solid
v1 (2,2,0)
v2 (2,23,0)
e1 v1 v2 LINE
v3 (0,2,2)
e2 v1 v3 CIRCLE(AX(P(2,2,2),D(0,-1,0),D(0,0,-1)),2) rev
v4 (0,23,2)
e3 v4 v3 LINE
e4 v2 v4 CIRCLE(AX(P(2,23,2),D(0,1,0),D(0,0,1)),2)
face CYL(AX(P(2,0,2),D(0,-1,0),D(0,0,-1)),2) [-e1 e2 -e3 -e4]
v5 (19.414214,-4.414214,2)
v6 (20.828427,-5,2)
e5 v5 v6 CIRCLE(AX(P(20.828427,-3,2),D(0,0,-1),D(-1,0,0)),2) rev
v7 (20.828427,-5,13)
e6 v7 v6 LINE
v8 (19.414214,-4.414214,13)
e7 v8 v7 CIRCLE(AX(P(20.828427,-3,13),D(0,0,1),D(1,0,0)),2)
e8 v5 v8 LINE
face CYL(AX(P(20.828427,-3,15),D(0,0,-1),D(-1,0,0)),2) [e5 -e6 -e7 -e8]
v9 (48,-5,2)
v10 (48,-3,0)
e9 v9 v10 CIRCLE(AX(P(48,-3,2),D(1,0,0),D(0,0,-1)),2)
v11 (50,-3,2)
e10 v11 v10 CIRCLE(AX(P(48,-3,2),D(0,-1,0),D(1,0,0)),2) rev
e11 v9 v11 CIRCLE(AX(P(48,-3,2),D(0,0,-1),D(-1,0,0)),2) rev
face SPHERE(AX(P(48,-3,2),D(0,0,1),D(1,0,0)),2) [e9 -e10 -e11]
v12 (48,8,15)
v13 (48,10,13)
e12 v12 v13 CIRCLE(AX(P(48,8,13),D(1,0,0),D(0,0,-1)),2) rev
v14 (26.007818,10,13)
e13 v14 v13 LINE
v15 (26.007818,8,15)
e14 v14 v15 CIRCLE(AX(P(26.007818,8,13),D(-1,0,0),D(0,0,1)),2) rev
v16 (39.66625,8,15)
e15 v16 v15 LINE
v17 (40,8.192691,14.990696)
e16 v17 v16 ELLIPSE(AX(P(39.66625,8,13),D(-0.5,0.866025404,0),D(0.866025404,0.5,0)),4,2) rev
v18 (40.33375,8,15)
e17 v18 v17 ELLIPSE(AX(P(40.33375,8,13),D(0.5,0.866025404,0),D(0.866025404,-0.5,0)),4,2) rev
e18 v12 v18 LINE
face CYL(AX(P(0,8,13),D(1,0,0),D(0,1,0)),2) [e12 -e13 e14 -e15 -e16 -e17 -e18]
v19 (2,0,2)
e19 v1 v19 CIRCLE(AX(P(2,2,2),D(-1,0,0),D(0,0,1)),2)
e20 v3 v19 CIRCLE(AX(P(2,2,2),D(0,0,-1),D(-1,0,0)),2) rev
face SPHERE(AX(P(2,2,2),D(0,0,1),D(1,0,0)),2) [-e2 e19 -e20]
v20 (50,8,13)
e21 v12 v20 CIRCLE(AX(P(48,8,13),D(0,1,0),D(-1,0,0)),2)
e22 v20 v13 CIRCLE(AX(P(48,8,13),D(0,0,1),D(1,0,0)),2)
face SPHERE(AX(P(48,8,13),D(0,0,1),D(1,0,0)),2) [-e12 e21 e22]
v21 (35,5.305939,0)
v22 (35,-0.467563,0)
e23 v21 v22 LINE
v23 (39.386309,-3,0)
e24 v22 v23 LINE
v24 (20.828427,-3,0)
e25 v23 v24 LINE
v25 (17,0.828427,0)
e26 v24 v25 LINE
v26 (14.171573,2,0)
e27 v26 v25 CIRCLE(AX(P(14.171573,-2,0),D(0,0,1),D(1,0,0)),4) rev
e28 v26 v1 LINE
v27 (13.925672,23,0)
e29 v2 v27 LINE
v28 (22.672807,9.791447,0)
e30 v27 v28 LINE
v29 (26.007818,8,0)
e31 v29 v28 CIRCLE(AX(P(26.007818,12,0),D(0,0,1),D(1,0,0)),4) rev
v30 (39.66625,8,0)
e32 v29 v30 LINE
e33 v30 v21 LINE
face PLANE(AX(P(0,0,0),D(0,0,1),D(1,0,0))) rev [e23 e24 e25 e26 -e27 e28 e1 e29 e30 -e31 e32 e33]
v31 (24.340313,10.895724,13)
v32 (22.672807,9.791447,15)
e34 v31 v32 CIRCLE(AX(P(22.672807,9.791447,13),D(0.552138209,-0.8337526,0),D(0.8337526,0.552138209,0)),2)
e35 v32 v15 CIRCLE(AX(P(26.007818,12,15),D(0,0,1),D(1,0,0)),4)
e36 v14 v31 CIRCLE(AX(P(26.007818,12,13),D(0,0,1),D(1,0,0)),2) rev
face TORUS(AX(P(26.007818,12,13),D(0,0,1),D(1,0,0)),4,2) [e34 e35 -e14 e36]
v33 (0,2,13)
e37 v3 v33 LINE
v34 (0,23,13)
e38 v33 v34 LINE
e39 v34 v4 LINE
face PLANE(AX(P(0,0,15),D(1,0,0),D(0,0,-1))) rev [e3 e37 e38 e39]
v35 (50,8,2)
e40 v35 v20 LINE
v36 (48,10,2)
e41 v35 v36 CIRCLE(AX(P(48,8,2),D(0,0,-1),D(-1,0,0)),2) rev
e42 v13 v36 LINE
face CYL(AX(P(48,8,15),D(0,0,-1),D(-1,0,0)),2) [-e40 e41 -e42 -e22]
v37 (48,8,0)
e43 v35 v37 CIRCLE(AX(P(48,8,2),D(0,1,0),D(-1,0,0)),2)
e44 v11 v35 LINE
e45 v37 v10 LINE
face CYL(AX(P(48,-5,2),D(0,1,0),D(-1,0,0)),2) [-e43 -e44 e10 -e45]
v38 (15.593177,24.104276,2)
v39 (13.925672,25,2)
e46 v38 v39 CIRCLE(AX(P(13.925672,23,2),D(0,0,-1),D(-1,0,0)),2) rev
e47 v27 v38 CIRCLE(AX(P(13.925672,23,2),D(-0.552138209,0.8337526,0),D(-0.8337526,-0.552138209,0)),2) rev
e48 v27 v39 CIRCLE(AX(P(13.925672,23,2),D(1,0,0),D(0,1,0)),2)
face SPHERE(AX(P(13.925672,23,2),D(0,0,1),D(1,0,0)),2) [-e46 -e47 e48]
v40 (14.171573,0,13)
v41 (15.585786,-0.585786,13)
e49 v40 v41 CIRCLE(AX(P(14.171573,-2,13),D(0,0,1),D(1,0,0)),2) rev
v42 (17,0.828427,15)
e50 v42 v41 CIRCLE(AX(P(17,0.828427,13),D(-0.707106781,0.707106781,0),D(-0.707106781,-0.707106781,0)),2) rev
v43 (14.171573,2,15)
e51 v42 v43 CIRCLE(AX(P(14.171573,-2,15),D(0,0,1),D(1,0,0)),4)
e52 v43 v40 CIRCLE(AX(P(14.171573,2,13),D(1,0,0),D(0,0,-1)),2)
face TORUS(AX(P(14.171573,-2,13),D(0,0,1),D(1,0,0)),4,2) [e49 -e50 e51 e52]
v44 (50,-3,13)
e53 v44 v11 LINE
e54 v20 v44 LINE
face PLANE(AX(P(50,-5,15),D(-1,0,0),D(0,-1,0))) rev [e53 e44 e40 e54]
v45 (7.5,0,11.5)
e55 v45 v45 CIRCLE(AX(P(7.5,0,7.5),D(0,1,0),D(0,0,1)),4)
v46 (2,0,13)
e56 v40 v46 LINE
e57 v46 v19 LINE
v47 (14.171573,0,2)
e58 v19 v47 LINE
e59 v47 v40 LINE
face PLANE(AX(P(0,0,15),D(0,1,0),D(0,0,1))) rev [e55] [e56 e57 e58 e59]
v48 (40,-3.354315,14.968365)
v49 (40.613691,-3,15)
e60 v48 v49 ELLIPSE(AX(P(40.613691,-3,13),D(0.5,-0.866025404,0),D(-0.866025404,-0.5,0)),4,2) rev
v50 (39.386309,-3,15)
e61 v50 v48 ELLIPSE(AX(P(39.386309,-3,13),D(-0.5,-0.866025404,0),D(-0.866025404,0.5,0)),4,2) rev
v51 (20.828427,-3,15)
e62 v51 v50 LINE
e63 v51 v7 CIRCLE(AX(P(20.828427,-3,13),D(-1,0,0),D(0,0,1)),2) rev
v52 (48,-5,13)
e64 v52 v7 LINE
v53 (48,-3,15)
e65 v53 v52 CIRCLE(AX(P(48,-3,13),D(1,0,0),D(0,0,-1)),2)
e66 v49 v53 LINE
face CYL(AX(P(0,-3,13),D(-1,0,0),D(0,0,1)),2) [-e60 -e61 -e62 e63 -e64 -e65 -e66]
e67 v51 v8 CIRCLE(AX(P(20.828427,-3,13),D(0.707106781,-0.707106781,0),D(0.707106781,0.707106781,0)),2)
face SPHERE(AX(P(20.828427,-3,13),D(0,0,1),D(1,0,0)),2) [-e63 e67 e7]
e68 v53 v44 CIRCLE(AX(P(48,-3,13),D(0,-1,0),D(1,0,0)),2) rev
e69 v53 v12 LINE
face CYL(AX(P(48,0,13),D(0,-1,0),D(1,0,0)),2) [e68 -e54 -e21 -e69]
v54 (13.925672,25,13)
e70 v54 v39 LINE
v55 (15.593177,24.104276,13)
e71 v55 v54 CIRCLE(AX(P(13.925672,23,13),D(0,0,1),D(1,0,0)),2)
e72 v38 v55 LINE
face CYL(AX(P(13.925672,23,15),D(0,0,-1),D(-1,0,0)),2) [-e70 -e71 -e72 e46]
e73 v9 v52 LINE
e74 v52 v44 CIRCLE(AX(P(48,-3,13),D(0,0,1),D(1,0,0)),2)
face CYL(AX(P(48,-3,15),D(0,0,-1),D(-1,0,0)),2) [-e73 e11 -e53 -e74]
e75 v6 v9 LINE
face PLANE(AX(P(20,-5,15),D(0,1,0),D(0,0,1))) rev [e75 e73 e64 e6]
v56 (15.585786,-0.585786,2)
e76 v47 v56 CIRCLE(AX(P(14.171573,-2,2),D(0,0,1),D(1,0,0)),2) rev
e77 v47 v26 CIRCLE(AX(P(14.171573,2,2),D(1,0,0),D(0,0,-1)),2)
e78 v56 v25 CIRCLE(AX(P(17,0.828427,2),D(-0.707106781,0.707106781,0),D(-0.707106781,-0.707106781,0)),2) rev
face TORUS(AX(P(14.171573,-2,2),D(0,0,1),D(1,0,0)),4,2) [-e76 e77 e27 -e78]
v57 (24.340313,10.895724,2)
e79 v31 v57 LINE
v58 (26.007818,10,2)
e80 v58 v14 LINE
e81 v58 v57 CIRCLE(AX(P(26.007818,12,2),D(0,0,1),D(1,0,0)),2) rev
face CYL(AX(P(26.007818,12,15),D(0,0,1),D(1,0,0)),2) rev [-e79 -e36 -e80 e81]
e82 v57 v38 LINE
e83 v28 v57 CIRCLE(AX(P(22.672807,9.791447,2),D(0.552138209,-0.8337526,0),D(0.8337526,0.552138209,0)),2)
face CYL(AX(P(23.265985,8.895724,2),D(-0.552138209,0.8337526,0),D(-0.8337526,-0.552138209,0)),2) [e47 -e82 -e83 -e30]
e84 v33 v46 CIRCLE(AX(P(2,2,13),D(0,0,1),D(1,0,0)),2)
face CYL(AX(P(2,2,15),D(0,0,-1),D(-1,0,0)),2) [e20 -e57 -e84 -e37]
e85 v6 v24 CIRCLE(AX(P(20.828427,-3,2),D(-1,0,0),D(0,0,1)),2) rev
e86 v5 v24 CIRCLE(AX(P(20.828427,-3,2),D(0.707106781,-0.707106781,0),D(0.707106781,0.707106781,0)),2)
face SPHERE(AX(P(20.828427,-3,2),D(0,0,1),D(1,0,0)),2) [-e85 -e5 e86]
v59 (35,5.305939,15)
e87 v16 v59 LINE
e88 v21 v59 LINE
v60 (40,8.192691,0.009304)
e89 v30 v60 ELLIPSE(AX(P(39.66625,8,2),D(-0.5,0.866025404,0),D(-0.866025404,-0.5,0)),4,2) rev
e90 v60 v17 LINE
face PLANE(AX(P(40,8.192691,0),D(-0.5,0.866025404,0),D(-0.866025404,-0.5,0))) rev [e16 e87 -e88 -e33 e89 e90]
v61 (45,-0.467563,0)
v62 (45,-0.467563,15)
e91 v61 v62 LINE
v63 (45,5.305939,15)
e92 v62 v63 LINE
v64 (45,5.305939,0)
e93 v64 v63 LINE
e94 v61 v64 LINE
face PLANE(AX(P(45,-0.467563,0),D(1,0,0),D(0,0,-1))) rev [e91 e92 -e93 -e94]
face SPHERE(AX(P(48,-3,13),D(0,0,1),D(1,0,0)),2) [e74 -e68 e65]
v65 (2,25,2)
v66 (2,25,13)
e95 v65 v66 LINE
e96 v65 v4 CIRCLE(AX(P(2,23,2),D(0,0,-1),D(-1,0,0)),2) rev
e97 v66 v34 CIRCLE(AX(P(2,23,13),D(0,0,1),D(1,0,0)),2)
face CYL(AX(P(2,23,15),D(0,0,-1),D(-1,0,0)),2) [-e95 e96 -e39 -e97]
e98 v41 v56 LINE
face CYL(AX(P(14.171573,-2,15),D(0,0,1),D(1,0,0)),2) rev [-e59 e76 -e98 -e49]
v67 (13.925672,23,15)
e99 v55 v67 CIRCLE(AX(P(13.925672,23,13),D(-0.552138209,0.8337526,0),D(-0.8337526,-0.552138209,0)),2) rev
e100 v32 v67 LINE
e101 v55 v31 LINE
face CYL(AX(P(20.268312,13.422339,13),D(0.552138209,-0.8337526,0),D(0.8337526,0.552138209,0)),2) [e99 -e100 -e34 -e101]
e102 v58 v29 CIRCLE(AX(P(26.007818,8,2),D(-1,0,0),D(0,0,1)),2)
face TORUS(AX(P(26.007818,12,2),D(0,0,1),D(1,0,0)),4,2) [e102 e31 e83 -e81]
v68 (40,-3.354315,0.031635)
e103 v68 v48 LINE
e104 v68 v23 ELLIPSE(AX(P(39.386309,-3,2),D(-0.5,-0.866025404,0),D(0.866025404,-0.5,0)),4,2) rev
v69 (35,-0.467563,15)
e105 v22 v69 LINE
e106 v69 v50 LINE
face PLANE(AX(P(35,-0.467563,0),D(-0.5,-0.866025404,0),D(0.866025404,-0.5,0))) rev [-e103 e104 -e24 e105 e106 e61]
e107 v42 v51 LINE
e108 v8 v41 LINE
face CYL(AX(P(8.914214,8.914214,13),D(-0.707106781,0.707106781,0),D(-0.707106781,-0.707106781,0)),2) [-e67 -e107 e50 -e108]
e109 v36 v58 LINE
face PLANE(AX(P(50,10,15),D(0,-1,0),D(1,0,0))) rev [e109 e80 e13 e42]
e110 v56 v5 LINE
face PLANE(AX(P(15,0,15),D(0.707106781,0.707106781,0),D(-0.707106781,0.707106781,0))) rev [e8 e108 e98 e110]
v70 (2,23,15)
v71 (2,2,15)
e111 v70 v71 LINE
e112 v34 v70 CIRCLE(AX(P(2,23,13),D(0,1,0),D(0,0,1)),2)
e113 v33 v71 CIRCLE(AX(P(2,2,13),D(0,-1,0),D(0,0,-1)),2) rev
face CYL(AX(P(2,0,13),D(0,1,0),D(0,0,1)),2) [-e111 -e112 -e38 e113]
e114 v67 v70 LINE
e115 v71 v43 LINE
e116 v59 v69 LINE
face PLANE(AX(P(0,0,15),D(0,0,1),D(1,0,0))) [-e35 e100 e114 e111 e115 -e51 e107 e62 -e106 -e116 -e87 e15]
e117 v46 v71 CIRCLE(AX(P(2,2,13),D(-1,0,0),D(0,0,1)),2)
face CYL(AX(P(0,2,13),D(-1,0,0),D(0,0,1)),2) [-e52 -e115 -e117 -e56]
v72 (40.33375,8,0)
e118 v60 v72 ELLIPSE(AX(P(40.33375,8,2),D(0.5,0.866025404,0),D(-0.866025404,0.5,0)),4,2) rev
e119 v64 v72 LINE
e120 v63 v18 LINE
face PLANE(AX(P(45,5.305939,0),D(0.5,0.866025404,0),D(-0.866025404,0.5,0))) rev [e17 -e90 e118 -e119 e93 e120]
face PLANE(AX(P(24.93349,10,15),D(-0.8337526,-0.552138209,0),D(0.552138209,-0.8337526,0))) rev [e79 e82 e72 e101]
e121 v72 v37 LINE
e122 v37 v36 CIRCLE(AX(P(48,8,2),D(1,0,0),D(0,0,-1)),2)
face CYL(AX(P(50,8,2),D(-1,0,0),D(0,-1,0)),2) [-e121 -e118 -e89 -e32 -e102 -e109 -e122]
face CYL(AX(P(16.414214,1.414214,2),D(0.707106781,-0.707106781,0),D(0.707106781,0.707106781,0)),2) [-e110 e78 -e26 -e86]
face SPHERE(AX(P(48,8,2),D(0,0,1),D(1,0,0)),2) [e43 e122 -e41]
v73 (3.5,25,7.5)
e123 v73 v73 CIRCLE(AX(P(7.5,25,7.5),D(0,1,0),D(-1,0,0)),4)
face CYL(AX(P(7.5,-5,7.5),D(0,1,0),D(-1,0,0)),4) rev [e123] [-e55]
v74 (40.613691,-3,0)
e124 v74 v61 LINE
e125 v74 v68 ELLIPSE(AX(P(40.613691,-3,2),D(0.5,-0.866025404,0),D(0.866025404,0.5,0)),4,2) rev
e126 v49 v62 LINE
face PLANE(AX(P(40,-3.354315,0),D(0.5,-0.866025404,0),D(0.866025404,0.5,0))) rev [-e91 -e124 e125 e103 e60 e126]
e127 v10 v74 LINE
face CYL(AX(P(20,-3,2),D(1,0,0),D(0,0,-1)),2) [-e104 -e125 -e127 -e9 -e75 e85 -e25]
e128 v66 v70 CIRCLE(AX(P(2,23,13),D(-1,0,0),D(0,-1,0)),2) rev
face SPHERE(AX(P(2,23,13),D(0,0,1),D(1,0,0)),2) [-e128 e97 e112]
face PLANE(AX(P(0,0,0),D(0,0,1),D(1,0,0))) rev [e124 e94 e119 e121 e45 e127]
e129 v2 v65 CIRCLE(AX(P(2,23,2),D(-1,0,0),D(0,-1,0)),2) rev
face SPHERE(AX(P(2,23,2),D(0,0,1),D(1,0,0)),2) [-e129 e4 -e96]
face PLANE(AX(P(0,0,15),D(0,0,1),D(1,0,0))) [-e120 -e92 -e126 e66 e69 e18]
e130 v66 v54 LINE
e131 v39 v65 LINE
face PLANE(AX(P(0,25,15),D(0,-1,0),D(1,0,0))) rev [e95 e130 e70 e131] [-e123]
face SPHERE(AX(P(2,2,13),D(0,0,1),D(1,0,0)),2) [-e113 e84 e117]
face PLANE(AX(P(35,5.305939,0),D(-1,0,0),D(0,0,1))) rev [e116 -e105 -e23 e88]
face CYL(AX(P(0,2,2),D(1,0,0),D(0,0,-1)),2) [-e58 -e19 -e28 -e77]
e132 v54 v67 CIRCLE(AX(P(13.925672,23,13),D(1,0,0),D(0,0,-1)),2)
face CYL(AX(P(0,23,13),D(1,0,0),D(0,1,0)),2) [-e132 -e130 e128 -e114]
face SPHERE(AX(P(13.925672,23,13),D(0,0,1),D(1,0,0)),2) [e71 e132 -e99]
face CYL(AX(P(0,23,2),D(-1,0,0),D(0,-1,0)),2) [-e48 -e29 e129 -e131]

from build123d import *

# Parameters (mm, degrees)
BOSS_EXTRUDE1_DEPTH = 15
SKETCH2_R           = 4.000000000000001
CUT_EXTRUDE1_DEPTH  = 61.20797289396146
CUT_EXTRUDE2_DEPTH  = 15
FILLET1_R           = 2


with BuildPart() as part:
    # Sketch1 → Boss-Extrude1 (new body)
    with BuildSketch(Plane.XY):
        Polygon((0, 0), (15, 0), (19.999999999999982, -5), (49.99999999999999, -5), (49.999999999999986, 10.000000000000002), (24.93349002823336, 9.999999999999998), (15, 24.999999999999993), (0, 24.999999999999996), align=None)
    extrude(amount=BOSS_EXTRUDE1_DEPTH)

    # Sketch2 → Cut-Extrude1 (cut, through all)
    with BuildSketch(Plane(origin=(5.78e-15, 24.999999999999996, 0), x_dir=(1, -2.3e-16, 0), z_dir=(2.3e-16, 1, 0))):
        with Locations(Location((7.499999999999995, -7.5, 0), (0, 0, 180))):
            Circle(SKETCH2_R)
    extrude(amount=-CUT_EXTRUDE1_DEPTH, mode=Mode.SUBTRACT)

    # Sketch3 → Cut-Extrude2 (cut)
    with BuildSketch(Plane.XY.offset(15)):
        Polygon((45, -0.4675632330808986), (45, 5.305939458815377), (39.99999999999999, 8.192690804763508), (34.999999999999986, 5.305939458815372), (34.999999999999986, -0.46756323308090486), (39.999999999999986, -3.354314579029036), align=None)
    extrude(amount=-CUT_EXTRUDE2_DEPTH, mode=Mode.SUBTRACT)

    # Fillet1
    # the kernel refuses this fillet: 2 mm, written as the material it adds along each edge
    with BuildSketch(Plane(origin=(24.93349002823336, 9.999999999999998, 0), x_dir=(-0.5521382091872268, 0.8337525999692728, 0), z_dir=(0, 0, 1))) as fillet1_piece_1:
        with BuildLine():
            CenterArc((FILLET1_R * 0.537163891098, -FILLET1_R), FILLET1_R, 90.00000000000004, 56.486172927445)
            Line((-FILLET1_R * 0.296588708871, -FILLET1_R * 0.447861790813), (0, 0))
            Line((0, 0), (FILLET1_R * 0.537163891098, -7e-17))
        make_face()
    extrude(amount=15)
    with BuildSketch(Plane(origin=(15, 0, 0), x_dir=(-1, 0, 0), z_dir=(0, 0, 1))) as fillet1_piece_2:
        with BuildLine():
            CenterArc((FILLET1_R * 0.414213562373, FILLET1_R), FILLET1_R, 224.99999999999994, 45.00000000000006)
            Line((-FILLET1_R * 0.292893218813, FILLET1_R * 0.292893218813), (0, 0))
            Line((0, 0), (FILLET1_R * 0.414213562373, 0))
        make_face()
    extrude(amount=15)
    # the kernel refuses this fillet: 2 mm, written as the material it takes off along each edge
    with BuildSketch(Plane(origin=(2, 2, 13), x_dir=(0, 0, 1), z_dir=(0, -1, 0))) as fillet1_2_piece_1_section:
        Polygon((0, 0), (FILLET1_R, 0), (FILLET1_R, FILLET1_R), (0, FILLET1_R), align=None)
    fillet1_2_piece_1 = extrude(amount=FILLET1_R, mode=Mode.PRIVATE)
    fillet1_2_piece_1 = fillet1_2_piece_1 - Plane(origin=(2, 2, 13), x_dir=(0.7071067811865475, 0, -0.7071067811865475), z_dir=(0, -1, 0)) * Sphere(FILLET1_R, mode=Mode.PRIVATE)
    add(fillet1_2_piece_1, mode=Mode.SUBTRACT)
    with BuildSketch(Plane(origin=(2, 22.999999999999996, 2), x_dir=(-1, 0, 0), z_dir=(0, 0, -1))) as fillet1_2_piece_2_section:
        Polygon((0, 0), (FILLET1_R, 0), (FILLET1_R, FILLET1_R), (-4.7e-16, FILLET1_R), align=None)
    fillet1_2_piece_2 = extrude(amount=FILLET1_R, mode=Mode.PRIVATE)
    fillet1_2_piece_2 = fillet1_2_piece_2 - Plane(origin=(2, 22.999999999999996, 2), x_dir=(0.7071067811865475, -0.7071067811865476, 0), z_dir=(0, 0, -1)) * Sphere(FILLET1_R, mode=Mode.PRIVATE)
    add(fillet1_2_piece_2, mode=Mode.SUBTRACT)
    with BuildSketch(Plane(origin=(2, 2, 2), x_dir=(0, 0, -1), z_dir=(0, -1, 0))) as fillet1_2_piece_3_section:
        Polygon((0, 0), (FILLET1_R, 0), (FILLET1_R, -FILLET1_R), (0, -FILLET1_R), align=None)
    fillet1_2_piece_3 = extrude(amount=FILLET1_R, mode=Mode.PRIVATE)
    fillet1_2_piece_3 = fillet1_2_piece_3 - Plane(origin=(2, 2, 2), x_dir=(0.7071067811865475, 0, 0.7071067811865475), z_dir=(0, -1, 0)) * Sphere(FILLET1_R, mode=Mode.PRIVATE)
    add(fillet1_2_piece_3, mode=Mode.SUBTRACT)
    with BuildSketch(Plane(origin=(13.92567221780351, 22.999999999999993, 2), x_dir=(0.8337525999692725, 0.5521382091872273, 0), z_dir=(0, 0, -1))) as fillet1_2_piece_4_section:
        Polygon((0, 0), (FILLET1_R, -3e-17), (FILLET1_R, -FILLET1_R * 0.537163891098), (FILLET1_R * 0.552138209187, -FILLET1_R * 0.833752599969), align=None)
    fillet1_2_piece_4 = extrude(amount=FILLET1_R, mode=Mode.PRIVATE)
    fillet1_2_piece_4 = fillet1_2_piece_4 - Plane(origin=(13.92567221780351, 22.999999999999993, 2), x_dir=(-0.47321337196489544, -0.8809478444230473, 0), z_dir=(0, 0, -1)) * Sphere(FILLET1_R, mode=Mode.PRIVATE)
    add(fillet1_2_piece_4, mode=Mode.SUBTRACT)
    with BuildSketch(Plane(origin=(20.828427124746174, -3, 13), x_dir=(-0.7071067811865488, -0.7071067811865462, 0), z_dir=(0, 0, 1))) as fillet1_2_piece_5_section:
        Polygon((0, 0), (FILLET1_R, -2e-17), (FILLET1_R, FILLET1_R * 0.414213562373), (FILLET1_R * 0.707106781187, FILLET1_R * 0.707106781187), align=None)
    fillet1_2_piece_5 = extrude(amount=FILLET1_R, mode=Mode.PRIVATE)
    fillet1_2_piece_5 = fillet1_2_piece_5 - Plane(origin=(20.828427124746174, -3, 13), x_dir=(0.3826834323650906, 0.9238795325112864, 0), z_dir=(0, 0, 1)) * Sphere(FILLET1_R, mode=Mode.PRIVATE)
    add(fillet1_2_piece_5, mode=Mode.SUBTRACT)
    with BuildSketch(Plane(origin=(13.925672217803509, 22.999999999999996, 13), x_dir=(2.4e-16, 1, 0), z_dir=(0, 0, 1))) as fillet1_2_piece_6_section:
        Polygon((0, 0), (FILLET1_R, 0), (FILLET1_R, -FILLET1_R * 0.537163891098), (FILLET1_R * 0.552138209187, -FILLET1_R * 0.833752599969), align=None)
    fillet1_2_piece_6 = extrude(amount=FILLET1_R, mode=Mode.PRIVATE)
    fillet1_2_piece_6 = fillet1_2_piece_6 - Plane(origin=(13.925672217803509, 22.999999999999996, 13), x_dir=(-0.47321337196489544, -0.8809478444230473, 0), z_dir=(0, 0, 1)) * Sphere(FILLET1_R, mode=Mode.PRIVATE)
    add(fillet1_2_piece_6, mode=Mode.SUBTRACT)
    with BuildSketch(Plane(origin=(47.999999999999986, 8.000000000000002, 2), x_dir=(1, 4.7e-16, 0), z_dir=(0, 0, -1))) as fillet1_2_piece_7_section:
        Polygon((0, 0), (FILLET1_R, 0), (FILLET1_R, -FILLET1_R), (6.6e-16, -FILLET1_R), align=None)
    fillet1_2_piece_7 = extrude(amount=FILLET1_R, mode=Mode.PRIVATE)
    fillet1_2_piece_7 = fillet1_2_piece_7 - Plane(origin=(47.999999999999986, 8.000000000000002, 2), x_dir=(-0.7071067811865472, -0.7071067811865477, 0), z_dir=(0, 0, -1)) * Sphere(FILLET1_R, mode=Mode.PRIVATE)
    add(fillet1_2_piece_7, mode=Mode.SUBTRACT)
    with BuildSketch(Plane(origin=(47.999999999999986, 8.000000000000002, 13), x_dir=(1, 4.7e-16, 0), z_dir=(0, 0, 1))) as fillet1_2_piece_8_section:
        Polygon((0, 0), (FILLET1_R, 0), (FILLET1_R, FILLET1_R), (6.6e-16, FILLET1_R), align=None)
    fillet1_2_piece_8 = extrude(amount=FILLET1_R, mode=Mode.PRIVATE)
    fillet1_2_piece_8 = fillet1_2_piece_8 - Plane(origin=(47.999999999999986, 8.000000000000002, 13), x_dir=(-0.7071067811865472, -0.7071067811865477, 0), z_dir=(0, 0, 1)) * Sphere(FILLET1_R, mode=Mode.PRIVATE)
    add(fillet1_2_piece_8, mode=Mode.SUBTRACT)
    with BuildSketch(Plane(origin=(47.99999999999999, -3, 2), x_dir=(0, 0, -1), z_dir=(0, -1, 0))) as fillet1_2_piece_9_section:
        Polygon((0, 0), (FILLET1_R, 0), (FILLET1_R, FILLET1_R), (0, FILLET1_R), align=None)
    fillet1_2_piece_9 = extrude(amount=FILLET1_R, mode=Mode.PRIVATE)
    fillet1_2_piece_9 = fillet1_2_piece_9 - Plane(origin=(47.99999999999999, -3, 2), x_dir=(-0.7071067811865475, 0, 0.7071067811865475), z_dir=(0, -1, 0)) * Sphere(FILLET1_R, mode=Mode.PRIVATE)
    add(fillet1_2_piece_9, mode=Mode.SUBTRACT)
    with BuildSketch(Plane(origin=(47.99999999999999, -3, 13), x_dir=(1, 4.7e-16, 0), z_dir=(0, -1, 0))) as fillet1_2_piece_10_section:
        Polygon((0, 0), (FILLET1_R, 0), (FILLET1_R, FILLET1_R), (0, FILLET1_R), align=None)
    fillet1_2_piece_10 = extrude(amount=FILLET1_R, mode=Mode.PRIVATE)
    fillet1_2_piece_10 = fillet1_2_piece_10 - Plane(origin=(47.99999999999999, -3, 13), x_dir=(-0.7071067811865475, 0, -0.7071067811865475), z_dir=(0, -1, 0)) * Sphere(FILLET1_R, mode=Mode.PRIVATE)
    add(fillet1_2_piece_10, mode=Mode.SUBTRACT)
    with BuildSketch(Plane(origin=(20.828427124746174, -3, 2), x_dir=(-0.7071067811865488, -0.7071067811865462, 0), z_dir=(0, 0, -1))) as fillet1_2_piece_11_section:
        Polygon((0, 0), (FILLET1_R, 2e-17), (FILLET1_R, -FILLET1_R * 0.414213562373), (FILLET1_R * 0.707106781187, -FILLET1_R * 0.707106781187), align=None)
    fillet1_2_piece_11 = extrude(amount=FILLET1_R, mode=Mode.PRIVATE)
    fillet1_2_piece_11 = fillet1_2_piece_11 - Plane(origin=(20.828427124746174, -3, 2), x_dir=(0.3826834323650906, 0.9238795325112864, 0), z_dir=(0, 0, -1)) * Sphere(FILLET1_R, mode=Mode.PRIVATE)
    add(fillet1_2_piece_11, mode=Mode.SUBTRACT)
    with BuildSketch(Plane(origin=(2, 22.999999999999996, 13), x_dir=(-1, 0, 0), z_dir=(0, 0, 1))) as fillet1_2_piece_12_section:
        Polygon((0, 0), (FILLET1_R, 0), (FILLET1_R, -FILLET1_R), (-4.7e-16, -FILLET1_R), align=None)
    fillet1_2_piece_12 = extrude(amount=FILLET1_R, mode=Mode.PRIVATE)
    fillet1_2_piece_12 = fillet1_2_piece_12 - Plane(origin=(2, 22.999999999999996, 13), x_dir=(0.7071067811865475, -0.7071067811865476, 0), z_dir=(0, 0, 1)) * Sphere(FILLET1_R, mode=Mode.PRIVATE)
    add(fillet1_2_piece_12, mode=Mode.SUBTRACT)
    with BuildSketch(Plane(origin=(1.9999999999999998, 0, 15), x_dir=(0, 0, -1), z_dir=(1, 0, 0))) as fillet1_2_piece_13:
        with BuildLine():
            CenterArc((FILLET1_R, FILLET1_R), FILLET1_R, 180, 90)
            Line((0, FILLET1_R), (0, 0))
            Line((0, 0), (FILLET1_R, 0))
        make_face()
    extrude(amount=12.171572875253808, mode=Mode.SUBTRACT)
    with BuildSketch(Plane(origin=(0, 22.999999999999996, 0), x_dir=(1, 0, 0), z_dir=(0, -1, 0))) as fillet1_2_piece_14:
        with BuildLine():
            CenterArc((FILLET1_R, FILLET1_R), FILLET1_R, 180, 90)
            Line((0, FILLET1_R), (0, 0))
            Line((0, 0), (FILLET1_R, 0))
        make_face()
    extrude(amount=20.999999999999996, mode=Mode.SUBTRACT)
    with BuildSketch(Plane(origin=(13.92567221780351, 24.999999999999993, 0), x_dir=(-2.4e-16, -1, 0), z_dir=(-1, 2.4e-16, 0))) as fillet1_2_piece_15:
        with BuildLine():
            CenterArc((FILLET1_R, FILLET1_R), FILLET1_R, 180, 90)
            Line((0, FILLET1_R), (0, 0))
            Line((0, 0), (FILLET1_R, 0))
        make_face()
    extrude(amount=11.92567221780351, mode=Mode.SUBTRACT)
    with BuildSketch(Plane(origin=(15.585786437626904, -0.5857864376269062, 15), x_dir=(0.7071067811865488, 0.7071067811865462, 0), z_dir=(0.7071067811865462, -0.7071067811865488, 0))) as fillet1_2_piece_16:
        with BuildLine():
            CenterArc((FILLET1_R, -FILLET1_R), FILLET1_R, 90, 90)
            Line((-1.88e-15, -FILLET1_R), (0, 0))
            Line((0, 0), (FILLET1_R, 0))
        make_face()
    extrude(amount=5.4142135623730825, mode=Mode.SUBTRACT)
    with BuildSketch(Plane(origin=(15, 24.999999999999993, 2), x_dir=(-1, 0, 0), z_dir=(0, 0, 1))) as fillet1_2_piece_17:
        with BuildLine():
            CenterArc((FILLET1_R * 0.537163891098, FILLET1_R), FILLET1_R, 213.5138270725551, 56.4861729274449)
            Line((-FILLET1_R * 0.296588708871, FILLET1_R * 0.447861790813), (0, 0))
            Line((0, 0), (FILLET1_R * 0.537163891098, 0))
        make_face()
    extrude(amount=11, mode=Mode.SUBTRACT)
    with BuildSketch(Plane(origin=(49.999999999999986, 10.000000000000002, 2), x_dir=(0, -1, 0), z_dir=(0, 0, 1))) as fillet1_2_piece_18:
        with BuildLine():
            CenterArc((FILLET1_R, -FILLET1_R), FILLET1_R, 90.00000000000006, 89.99999999999994)
            Line((1.78e-15, -FILLET1_R), (0, 0))
            Line((0, 0), (FILLET1_R, 0))
        make_face()
    extrude(amount=11, mode=Mode.SUBTRACT)
    with BuildSketch(Plane(origin=(49.99999999999999, -5, 2), x_dir=(-1, 0, 0), z_dir=(0, 0, 1))) as fillet1_2_piece_19:
        with BuildLine():
            CenterArc((FILLET1_R, -FILLET1_R), FILLET1_R, 90, 90)
            Line((0, -FILLET1_R), (0, 0))
            Line((0, 0), (FILLET1_R, 0))
        make_face()
    extrude(amount=11, mode=Mode.SUBTRACT)
    with BuildSketch(Plane(origin=(19.999999999999982, -5, 2), x_dir=(-0.7071067811865454, 0.7071067811865497, 0), z_dir=(0, 0, 1))) as fillet1_2_piece_20:
        with BuildLine():
            CenterArc((FILLET1_R * 0.414213562373, -FILLET1_R), FILLET1_R, 90.00000000000001, 45.00000000000007)
            Line((-FILLET1_R * 0.292893218813, -FILLET1_R * 0.292893218813), (0, 0))
            Line((0, 0), (FILLET1_R * 0.414213562373, 1e-17))
        make_face()
    extrude(amount=11, mode=Mode.SUBTRACT)
    with BuildSketch(Plane(origin=(0, 0, 2), x_dir=(1, 0, 0), z_dir=(0, 0, 1))) as fillet1_2_piece_21:
        with BuildLine():
            CenterArc((FILLET1_R, FILLET1_R), FILLET1_R, 180, 90)
            Line((-2.2e-16, FILLET1_R), (0, 0))
            Line((0, 0), (FILLET1_R, 0))
        make_face()
    extrude(amount=11, mode=Mode.SUBTRACT)
    with BuildSketch(Plane(origin=(0, 24.999999999999996, 2), x_dir=(0, -1, 0), z_dir=(0, 0, 1))) as fillet1_2_piece_22:
        with BuildLine():
            CenterArc((FILLET1_R, FILLET1_R), FILLET1_R, 180, 90)
            Line((0, FILLET1_R), (0, 0))
            Line((0, 0), (FILLET1_R, 0))
        make_face()
    extrude(amount=11, mode=Mode.SUBTRACT)
    with BuildSketch(Plane(origin=(20.828427124746174, -5, 15), x_dir=(0, 1, 0), z_dir=(1, 0, 0))) as fillet1_2_piece_23:
        with BuildLine():
            CenterArc((FILLET1_R, -FILLET1_R), FILLET1_R, 90, 90)
            Line((8.9e-16, -FILLET1_R), (0, 0))
            Line((0, 0), (FILLET1_R, 0))
        make_face()
    extrude(amount=27.17157287525382, mode=Mode.SUBTRACT)
    with BuildSketch(Plane(origin=(49.99999999999999, -2.999999999999999, 15), x_dir=(-1, -4.7e-16, 0), z_dir=(-4.7e-16, 1, 0))) as fillet1_2_piece_24:
        with BuildLine():
            CenterArc((FILLET1_R, -FILLET1_R), FILLET1_R, 90, 90)
            Line((0, -FILLET1_R), (0, 0))
            Line((0, 0), (FILLET1_R, 0))
        make_face()
    extrude(amount=11.000000000000004, mode=Mode.SUBTRACT)
    with BuildSketch(Plane(origin=(47.999999999999986, 10.000000000000002, 15), x_dir=(1.4e-16, -1, 0), z_dir=(-1, -1.4e-16, 0))) as fillet1_2_piece_25:
        with BuildLine():
            CenterArc((FILLET1_R, -FILLET1_R), FILLET1_R, 90, 90)
            Line((0, -FILLET1_R), (0, 0))
            Line((0, 0), (FILLET1_R, 0))
        make_face()
    extrude(amount=21.992182189570133, mode=Mode.SUBTRACT)
    with BuildSketch(Plane(origin=(24.340312610491306, 10.895723581625546, 15), x_dir=(-0.8337525999692724, -0.5521382091872273, 0), z_dir=(-0.5521382091872273, 0.8337525999692725, 0))) as fillet1_2_piece_26:
        with BuildLine():
            CenterArc((FILLET1_R, -FILLET1_R), FILLET1_R, 90, 90)
            Line((-9.8e-16, -FILLET1_R), (0, 0))
            Line((0, 0), (FILLET1_R, 0))
        make_face()
    extrude(amount=15.842292830314058, mode=Mode.SUBTRACT)
    with BuildSketch(Plane(origin=(13.925672217803509, 24.999999999999993, 15), x_dir=(-2.4e-16, -1, 0), z_dir=(-1, 2.4e-16, 0))) as fillet1_2_piece_27:
        with BuildLine():
            CenterArc((FILLET1_R, -FILLET1_R), FILLET1_R, 90, 90)
            Line((0, -FILLET1_R), (0, 0))
            Line((0, 0), (FILLET1_R, 0))
        make_face()
    extrude(amount=11.925672217803509, mode=Mode.SUBTRACT)
    with BuildSketch(Plane(origin=(0, 22.999999999999996, 15), x_dir=(1, 0, 0), z_dir=(0, -1, 0))) as fillet1_2_piece_28:
        with BuildLine():
            CenterArc((FILLET1_R, -FILLET1_R), FILLET1_R, 90, 90)
            Line((0, -FILLET1_R), (0, 0))
            Line((0, 0), (FILLET1_R, 0))
        make_face()
    extrude(amount=20.999999999999996, mode=Mode.SUBTRACT)
    with BuildSketch(Plane(origin=(24.340312610491306, 10.895723581625546, 0), x_dir=(-0.8337525999692724, -0.5521382091872273, 0), z_dir=(-0.5521382091872273, 0.8337525999692725, 0))) as fillet1_2_piece_29:
        with BuildLine():
            CenterArc((FILLET1_R, FILLET1_R), FILLET1_R, 180, 90)
            Line((-9.8e-16, FILLET1_R), (0, 0))
            Line((0, 0), (FILLET1_R, 0))
        make_face()
    extrude(amount=15.84229283031405, mode=Mode.SUBTRACT)
    with BuildSketch(Plane(origin=(47.999999999999986, 10.000000000000002, 0), x_dir=(1.4e-16, -1, 0), z_dir=(-1, -1.4e-16, 0))) as fillet1_2_piece_30:
        with BuildLine():
            CenterArc((FILLET1_R, FILLET1_R), FILLET1_R, 180, 90)
            Line((0, FILLET1_R), (0, 0))
            Line((0, 0), (FILLET1_R, 0))
        make_face()
    extrude(amount=21.992182189570133, mode=Mode.SUBTRACT)
    with BuildSketch(Plane(origin=(49.99999999999999, -2.999999999999999, 0), x_dir=(-1, -4.7e-16, 0), z_dir=(-4.7e-16, 1, 0))) as fillet1_2_piece_31:
        with BuildLine():
            CenterArc((FILLET1_R, FILLET1_R), FILLET1_R, 180, 90)
            Line((0, FILLET1_R), (0, 0))
            Line((0, 0), (FILLET1_R, 0))
        make_face()
    extrude(amount=11.000000000000004, mode=Mode.SUBTRACT)
    with BuildSketch(Plane(origin=(20.828427124746174, -5, 0), x_dir=(0, 1, 0), z_dir=(1, 0, 0))) as fillet1_2_piece_32:
        with BuildLine():
            CenterArc((FILLET1_R, FILLET1_R), FILLET1_R, 180, 90)
            Line((8.9e-16, FILLET1_R), (0, 0))
            Line((0, 0), (FILLET1_R, 0))
        make_face()
    extrude(amount=27.17157287525382, mode=Mode.SUBTRACT)
    with BuildSketch(Plane(origin=(15.585786437626904, -0.5857864376269062, 0), x_dir=(0.7071067811865488, 0.7071067811865462, 0), z_dir=(0.7071067811865462, -0.7071067811865488, 0))) as fillet1_2_piece_33:
        with BuildLine():
            CenterArc((FILLET1_R, FILLET1_R), FILLET1_R, 180, 90)
            Line((-1.88e-15, FILLET1_R), (0, 0))
            Line((0, 0), (FILLET1_R, 0))
        make_face()
    extrude(amount=5.4142135623730825, mode=Mode.SUBTRACT)
    with BuildSketch(Plane(origin=(1.9999999999999998, 0, 0), x_dir=(0, 0, 1), z_dir=(1, 0, 0))) as fillet1_2_piece_34:
        with BuildLine():
            CenterArc((FILLET1_R, -FILLET1_R), FILLET1_R, 90, 90)
            Line((-2.2e-16, -FILLET1_R), (0, 0))
            Line((0, 0), (FILLET1_R, 0))
        make_face()
    extrude(amount=12.171572875253808, mode=Mode.SUBTRACT)
    with BuildSketch(Plane(origin=(14.171572875253808, -2, 0), x_dir=(0, 1, 0), z_dir=(-1, 0, 0))) as fillet1_2_piece_35:
        with BuildLine():
            CenterArc((2 + FILLET1_R, -FILLET1_R), FILLET1_R, 90, 90)
            Line((2, -FILLET1_R), (2, 0))
            Line((2, 0), (2 + FILLET1_R, 0))
        make_face()
    revolve(axis=Axis((14.171572875253808, -2, 0), (0, 0, -1)), revolution_arc=45.00000000000004, mode=Mode.SUBTRACT)
    with BuildSketch(Plane(origin=(26.007817810429852, 12, 0), x_dir=(-0.8337525999692728, -0.5521382091872268, 0), z_dir=(-0.5521382091872268, 0.8337525999692728, 0))) as fillet1_2_piece_36:
        with BuildLine():
            CenterArc((2.0000000000000004 + FILLET1_R, FILLET1_R), FILLET1_R, 180, 90)
            Line((1.9999999999999996, FILLET1_R), (2.0000000000000004, 0))
            Line((2.0000000000000004, 0), (2.0000000000000004 + FILLET1_R, 0))
        make_face()
    revolve(axis=Axis((26.007817810429852, 12, 0), (0, 0, 1)), revolution_arc=56.486172927445004, mode=Mode.SUBTRACT)
    with BuildSketch(Plane(origin=(26.007817810429852, 12, 15), x_dir=(-0.8337525999692728, -0.5521382091872268, 0), z_dir=(-0.5521382091872268, 0.8337525999692728, 0))) as fillet1_2_piece_37:
        with BuildLine():
            CenterArc((2.0000000000000004 + FILLET1_R, -FILLET1_R), FILLET1_R, 90, 90)
            Line((1.9999999999999996, -FILLET1_R), (2.0000000000000004, 0))
            Line((2.0000000000000004, 0), (2.0000000000000004 + FILLET1_R, 0))
        make_face()
    revolve(axis=Axis((26.007817810429852, 12, 15), (0, 0, 1)), revolution_arc=56.486172927445004, mode=Mode.SUBTRACT)
    with BuildSketch(Plane(origin=(14.171572875253808, -2, 15), x_dir=(0, 1, 0), z_dir=(-1, 0, 0))) as fillet1_2_piece_38:
        with BuildLine():
            CenterArc((2 + FILLET1_R, FILLET1_R), FILLET1_R, 180, 90)
            Line((2 + FILLET1_R, 0), (2, 0))
            Line((2, 0), (2, FILLET1_R))
        make_face()
    revolve(axis=Axis((14.171572875253808, -2, 15), (0, 0, -1)), revolution_arc=45.00000000000004, mode=Mode.SUBTRACT)


solid = part.part
